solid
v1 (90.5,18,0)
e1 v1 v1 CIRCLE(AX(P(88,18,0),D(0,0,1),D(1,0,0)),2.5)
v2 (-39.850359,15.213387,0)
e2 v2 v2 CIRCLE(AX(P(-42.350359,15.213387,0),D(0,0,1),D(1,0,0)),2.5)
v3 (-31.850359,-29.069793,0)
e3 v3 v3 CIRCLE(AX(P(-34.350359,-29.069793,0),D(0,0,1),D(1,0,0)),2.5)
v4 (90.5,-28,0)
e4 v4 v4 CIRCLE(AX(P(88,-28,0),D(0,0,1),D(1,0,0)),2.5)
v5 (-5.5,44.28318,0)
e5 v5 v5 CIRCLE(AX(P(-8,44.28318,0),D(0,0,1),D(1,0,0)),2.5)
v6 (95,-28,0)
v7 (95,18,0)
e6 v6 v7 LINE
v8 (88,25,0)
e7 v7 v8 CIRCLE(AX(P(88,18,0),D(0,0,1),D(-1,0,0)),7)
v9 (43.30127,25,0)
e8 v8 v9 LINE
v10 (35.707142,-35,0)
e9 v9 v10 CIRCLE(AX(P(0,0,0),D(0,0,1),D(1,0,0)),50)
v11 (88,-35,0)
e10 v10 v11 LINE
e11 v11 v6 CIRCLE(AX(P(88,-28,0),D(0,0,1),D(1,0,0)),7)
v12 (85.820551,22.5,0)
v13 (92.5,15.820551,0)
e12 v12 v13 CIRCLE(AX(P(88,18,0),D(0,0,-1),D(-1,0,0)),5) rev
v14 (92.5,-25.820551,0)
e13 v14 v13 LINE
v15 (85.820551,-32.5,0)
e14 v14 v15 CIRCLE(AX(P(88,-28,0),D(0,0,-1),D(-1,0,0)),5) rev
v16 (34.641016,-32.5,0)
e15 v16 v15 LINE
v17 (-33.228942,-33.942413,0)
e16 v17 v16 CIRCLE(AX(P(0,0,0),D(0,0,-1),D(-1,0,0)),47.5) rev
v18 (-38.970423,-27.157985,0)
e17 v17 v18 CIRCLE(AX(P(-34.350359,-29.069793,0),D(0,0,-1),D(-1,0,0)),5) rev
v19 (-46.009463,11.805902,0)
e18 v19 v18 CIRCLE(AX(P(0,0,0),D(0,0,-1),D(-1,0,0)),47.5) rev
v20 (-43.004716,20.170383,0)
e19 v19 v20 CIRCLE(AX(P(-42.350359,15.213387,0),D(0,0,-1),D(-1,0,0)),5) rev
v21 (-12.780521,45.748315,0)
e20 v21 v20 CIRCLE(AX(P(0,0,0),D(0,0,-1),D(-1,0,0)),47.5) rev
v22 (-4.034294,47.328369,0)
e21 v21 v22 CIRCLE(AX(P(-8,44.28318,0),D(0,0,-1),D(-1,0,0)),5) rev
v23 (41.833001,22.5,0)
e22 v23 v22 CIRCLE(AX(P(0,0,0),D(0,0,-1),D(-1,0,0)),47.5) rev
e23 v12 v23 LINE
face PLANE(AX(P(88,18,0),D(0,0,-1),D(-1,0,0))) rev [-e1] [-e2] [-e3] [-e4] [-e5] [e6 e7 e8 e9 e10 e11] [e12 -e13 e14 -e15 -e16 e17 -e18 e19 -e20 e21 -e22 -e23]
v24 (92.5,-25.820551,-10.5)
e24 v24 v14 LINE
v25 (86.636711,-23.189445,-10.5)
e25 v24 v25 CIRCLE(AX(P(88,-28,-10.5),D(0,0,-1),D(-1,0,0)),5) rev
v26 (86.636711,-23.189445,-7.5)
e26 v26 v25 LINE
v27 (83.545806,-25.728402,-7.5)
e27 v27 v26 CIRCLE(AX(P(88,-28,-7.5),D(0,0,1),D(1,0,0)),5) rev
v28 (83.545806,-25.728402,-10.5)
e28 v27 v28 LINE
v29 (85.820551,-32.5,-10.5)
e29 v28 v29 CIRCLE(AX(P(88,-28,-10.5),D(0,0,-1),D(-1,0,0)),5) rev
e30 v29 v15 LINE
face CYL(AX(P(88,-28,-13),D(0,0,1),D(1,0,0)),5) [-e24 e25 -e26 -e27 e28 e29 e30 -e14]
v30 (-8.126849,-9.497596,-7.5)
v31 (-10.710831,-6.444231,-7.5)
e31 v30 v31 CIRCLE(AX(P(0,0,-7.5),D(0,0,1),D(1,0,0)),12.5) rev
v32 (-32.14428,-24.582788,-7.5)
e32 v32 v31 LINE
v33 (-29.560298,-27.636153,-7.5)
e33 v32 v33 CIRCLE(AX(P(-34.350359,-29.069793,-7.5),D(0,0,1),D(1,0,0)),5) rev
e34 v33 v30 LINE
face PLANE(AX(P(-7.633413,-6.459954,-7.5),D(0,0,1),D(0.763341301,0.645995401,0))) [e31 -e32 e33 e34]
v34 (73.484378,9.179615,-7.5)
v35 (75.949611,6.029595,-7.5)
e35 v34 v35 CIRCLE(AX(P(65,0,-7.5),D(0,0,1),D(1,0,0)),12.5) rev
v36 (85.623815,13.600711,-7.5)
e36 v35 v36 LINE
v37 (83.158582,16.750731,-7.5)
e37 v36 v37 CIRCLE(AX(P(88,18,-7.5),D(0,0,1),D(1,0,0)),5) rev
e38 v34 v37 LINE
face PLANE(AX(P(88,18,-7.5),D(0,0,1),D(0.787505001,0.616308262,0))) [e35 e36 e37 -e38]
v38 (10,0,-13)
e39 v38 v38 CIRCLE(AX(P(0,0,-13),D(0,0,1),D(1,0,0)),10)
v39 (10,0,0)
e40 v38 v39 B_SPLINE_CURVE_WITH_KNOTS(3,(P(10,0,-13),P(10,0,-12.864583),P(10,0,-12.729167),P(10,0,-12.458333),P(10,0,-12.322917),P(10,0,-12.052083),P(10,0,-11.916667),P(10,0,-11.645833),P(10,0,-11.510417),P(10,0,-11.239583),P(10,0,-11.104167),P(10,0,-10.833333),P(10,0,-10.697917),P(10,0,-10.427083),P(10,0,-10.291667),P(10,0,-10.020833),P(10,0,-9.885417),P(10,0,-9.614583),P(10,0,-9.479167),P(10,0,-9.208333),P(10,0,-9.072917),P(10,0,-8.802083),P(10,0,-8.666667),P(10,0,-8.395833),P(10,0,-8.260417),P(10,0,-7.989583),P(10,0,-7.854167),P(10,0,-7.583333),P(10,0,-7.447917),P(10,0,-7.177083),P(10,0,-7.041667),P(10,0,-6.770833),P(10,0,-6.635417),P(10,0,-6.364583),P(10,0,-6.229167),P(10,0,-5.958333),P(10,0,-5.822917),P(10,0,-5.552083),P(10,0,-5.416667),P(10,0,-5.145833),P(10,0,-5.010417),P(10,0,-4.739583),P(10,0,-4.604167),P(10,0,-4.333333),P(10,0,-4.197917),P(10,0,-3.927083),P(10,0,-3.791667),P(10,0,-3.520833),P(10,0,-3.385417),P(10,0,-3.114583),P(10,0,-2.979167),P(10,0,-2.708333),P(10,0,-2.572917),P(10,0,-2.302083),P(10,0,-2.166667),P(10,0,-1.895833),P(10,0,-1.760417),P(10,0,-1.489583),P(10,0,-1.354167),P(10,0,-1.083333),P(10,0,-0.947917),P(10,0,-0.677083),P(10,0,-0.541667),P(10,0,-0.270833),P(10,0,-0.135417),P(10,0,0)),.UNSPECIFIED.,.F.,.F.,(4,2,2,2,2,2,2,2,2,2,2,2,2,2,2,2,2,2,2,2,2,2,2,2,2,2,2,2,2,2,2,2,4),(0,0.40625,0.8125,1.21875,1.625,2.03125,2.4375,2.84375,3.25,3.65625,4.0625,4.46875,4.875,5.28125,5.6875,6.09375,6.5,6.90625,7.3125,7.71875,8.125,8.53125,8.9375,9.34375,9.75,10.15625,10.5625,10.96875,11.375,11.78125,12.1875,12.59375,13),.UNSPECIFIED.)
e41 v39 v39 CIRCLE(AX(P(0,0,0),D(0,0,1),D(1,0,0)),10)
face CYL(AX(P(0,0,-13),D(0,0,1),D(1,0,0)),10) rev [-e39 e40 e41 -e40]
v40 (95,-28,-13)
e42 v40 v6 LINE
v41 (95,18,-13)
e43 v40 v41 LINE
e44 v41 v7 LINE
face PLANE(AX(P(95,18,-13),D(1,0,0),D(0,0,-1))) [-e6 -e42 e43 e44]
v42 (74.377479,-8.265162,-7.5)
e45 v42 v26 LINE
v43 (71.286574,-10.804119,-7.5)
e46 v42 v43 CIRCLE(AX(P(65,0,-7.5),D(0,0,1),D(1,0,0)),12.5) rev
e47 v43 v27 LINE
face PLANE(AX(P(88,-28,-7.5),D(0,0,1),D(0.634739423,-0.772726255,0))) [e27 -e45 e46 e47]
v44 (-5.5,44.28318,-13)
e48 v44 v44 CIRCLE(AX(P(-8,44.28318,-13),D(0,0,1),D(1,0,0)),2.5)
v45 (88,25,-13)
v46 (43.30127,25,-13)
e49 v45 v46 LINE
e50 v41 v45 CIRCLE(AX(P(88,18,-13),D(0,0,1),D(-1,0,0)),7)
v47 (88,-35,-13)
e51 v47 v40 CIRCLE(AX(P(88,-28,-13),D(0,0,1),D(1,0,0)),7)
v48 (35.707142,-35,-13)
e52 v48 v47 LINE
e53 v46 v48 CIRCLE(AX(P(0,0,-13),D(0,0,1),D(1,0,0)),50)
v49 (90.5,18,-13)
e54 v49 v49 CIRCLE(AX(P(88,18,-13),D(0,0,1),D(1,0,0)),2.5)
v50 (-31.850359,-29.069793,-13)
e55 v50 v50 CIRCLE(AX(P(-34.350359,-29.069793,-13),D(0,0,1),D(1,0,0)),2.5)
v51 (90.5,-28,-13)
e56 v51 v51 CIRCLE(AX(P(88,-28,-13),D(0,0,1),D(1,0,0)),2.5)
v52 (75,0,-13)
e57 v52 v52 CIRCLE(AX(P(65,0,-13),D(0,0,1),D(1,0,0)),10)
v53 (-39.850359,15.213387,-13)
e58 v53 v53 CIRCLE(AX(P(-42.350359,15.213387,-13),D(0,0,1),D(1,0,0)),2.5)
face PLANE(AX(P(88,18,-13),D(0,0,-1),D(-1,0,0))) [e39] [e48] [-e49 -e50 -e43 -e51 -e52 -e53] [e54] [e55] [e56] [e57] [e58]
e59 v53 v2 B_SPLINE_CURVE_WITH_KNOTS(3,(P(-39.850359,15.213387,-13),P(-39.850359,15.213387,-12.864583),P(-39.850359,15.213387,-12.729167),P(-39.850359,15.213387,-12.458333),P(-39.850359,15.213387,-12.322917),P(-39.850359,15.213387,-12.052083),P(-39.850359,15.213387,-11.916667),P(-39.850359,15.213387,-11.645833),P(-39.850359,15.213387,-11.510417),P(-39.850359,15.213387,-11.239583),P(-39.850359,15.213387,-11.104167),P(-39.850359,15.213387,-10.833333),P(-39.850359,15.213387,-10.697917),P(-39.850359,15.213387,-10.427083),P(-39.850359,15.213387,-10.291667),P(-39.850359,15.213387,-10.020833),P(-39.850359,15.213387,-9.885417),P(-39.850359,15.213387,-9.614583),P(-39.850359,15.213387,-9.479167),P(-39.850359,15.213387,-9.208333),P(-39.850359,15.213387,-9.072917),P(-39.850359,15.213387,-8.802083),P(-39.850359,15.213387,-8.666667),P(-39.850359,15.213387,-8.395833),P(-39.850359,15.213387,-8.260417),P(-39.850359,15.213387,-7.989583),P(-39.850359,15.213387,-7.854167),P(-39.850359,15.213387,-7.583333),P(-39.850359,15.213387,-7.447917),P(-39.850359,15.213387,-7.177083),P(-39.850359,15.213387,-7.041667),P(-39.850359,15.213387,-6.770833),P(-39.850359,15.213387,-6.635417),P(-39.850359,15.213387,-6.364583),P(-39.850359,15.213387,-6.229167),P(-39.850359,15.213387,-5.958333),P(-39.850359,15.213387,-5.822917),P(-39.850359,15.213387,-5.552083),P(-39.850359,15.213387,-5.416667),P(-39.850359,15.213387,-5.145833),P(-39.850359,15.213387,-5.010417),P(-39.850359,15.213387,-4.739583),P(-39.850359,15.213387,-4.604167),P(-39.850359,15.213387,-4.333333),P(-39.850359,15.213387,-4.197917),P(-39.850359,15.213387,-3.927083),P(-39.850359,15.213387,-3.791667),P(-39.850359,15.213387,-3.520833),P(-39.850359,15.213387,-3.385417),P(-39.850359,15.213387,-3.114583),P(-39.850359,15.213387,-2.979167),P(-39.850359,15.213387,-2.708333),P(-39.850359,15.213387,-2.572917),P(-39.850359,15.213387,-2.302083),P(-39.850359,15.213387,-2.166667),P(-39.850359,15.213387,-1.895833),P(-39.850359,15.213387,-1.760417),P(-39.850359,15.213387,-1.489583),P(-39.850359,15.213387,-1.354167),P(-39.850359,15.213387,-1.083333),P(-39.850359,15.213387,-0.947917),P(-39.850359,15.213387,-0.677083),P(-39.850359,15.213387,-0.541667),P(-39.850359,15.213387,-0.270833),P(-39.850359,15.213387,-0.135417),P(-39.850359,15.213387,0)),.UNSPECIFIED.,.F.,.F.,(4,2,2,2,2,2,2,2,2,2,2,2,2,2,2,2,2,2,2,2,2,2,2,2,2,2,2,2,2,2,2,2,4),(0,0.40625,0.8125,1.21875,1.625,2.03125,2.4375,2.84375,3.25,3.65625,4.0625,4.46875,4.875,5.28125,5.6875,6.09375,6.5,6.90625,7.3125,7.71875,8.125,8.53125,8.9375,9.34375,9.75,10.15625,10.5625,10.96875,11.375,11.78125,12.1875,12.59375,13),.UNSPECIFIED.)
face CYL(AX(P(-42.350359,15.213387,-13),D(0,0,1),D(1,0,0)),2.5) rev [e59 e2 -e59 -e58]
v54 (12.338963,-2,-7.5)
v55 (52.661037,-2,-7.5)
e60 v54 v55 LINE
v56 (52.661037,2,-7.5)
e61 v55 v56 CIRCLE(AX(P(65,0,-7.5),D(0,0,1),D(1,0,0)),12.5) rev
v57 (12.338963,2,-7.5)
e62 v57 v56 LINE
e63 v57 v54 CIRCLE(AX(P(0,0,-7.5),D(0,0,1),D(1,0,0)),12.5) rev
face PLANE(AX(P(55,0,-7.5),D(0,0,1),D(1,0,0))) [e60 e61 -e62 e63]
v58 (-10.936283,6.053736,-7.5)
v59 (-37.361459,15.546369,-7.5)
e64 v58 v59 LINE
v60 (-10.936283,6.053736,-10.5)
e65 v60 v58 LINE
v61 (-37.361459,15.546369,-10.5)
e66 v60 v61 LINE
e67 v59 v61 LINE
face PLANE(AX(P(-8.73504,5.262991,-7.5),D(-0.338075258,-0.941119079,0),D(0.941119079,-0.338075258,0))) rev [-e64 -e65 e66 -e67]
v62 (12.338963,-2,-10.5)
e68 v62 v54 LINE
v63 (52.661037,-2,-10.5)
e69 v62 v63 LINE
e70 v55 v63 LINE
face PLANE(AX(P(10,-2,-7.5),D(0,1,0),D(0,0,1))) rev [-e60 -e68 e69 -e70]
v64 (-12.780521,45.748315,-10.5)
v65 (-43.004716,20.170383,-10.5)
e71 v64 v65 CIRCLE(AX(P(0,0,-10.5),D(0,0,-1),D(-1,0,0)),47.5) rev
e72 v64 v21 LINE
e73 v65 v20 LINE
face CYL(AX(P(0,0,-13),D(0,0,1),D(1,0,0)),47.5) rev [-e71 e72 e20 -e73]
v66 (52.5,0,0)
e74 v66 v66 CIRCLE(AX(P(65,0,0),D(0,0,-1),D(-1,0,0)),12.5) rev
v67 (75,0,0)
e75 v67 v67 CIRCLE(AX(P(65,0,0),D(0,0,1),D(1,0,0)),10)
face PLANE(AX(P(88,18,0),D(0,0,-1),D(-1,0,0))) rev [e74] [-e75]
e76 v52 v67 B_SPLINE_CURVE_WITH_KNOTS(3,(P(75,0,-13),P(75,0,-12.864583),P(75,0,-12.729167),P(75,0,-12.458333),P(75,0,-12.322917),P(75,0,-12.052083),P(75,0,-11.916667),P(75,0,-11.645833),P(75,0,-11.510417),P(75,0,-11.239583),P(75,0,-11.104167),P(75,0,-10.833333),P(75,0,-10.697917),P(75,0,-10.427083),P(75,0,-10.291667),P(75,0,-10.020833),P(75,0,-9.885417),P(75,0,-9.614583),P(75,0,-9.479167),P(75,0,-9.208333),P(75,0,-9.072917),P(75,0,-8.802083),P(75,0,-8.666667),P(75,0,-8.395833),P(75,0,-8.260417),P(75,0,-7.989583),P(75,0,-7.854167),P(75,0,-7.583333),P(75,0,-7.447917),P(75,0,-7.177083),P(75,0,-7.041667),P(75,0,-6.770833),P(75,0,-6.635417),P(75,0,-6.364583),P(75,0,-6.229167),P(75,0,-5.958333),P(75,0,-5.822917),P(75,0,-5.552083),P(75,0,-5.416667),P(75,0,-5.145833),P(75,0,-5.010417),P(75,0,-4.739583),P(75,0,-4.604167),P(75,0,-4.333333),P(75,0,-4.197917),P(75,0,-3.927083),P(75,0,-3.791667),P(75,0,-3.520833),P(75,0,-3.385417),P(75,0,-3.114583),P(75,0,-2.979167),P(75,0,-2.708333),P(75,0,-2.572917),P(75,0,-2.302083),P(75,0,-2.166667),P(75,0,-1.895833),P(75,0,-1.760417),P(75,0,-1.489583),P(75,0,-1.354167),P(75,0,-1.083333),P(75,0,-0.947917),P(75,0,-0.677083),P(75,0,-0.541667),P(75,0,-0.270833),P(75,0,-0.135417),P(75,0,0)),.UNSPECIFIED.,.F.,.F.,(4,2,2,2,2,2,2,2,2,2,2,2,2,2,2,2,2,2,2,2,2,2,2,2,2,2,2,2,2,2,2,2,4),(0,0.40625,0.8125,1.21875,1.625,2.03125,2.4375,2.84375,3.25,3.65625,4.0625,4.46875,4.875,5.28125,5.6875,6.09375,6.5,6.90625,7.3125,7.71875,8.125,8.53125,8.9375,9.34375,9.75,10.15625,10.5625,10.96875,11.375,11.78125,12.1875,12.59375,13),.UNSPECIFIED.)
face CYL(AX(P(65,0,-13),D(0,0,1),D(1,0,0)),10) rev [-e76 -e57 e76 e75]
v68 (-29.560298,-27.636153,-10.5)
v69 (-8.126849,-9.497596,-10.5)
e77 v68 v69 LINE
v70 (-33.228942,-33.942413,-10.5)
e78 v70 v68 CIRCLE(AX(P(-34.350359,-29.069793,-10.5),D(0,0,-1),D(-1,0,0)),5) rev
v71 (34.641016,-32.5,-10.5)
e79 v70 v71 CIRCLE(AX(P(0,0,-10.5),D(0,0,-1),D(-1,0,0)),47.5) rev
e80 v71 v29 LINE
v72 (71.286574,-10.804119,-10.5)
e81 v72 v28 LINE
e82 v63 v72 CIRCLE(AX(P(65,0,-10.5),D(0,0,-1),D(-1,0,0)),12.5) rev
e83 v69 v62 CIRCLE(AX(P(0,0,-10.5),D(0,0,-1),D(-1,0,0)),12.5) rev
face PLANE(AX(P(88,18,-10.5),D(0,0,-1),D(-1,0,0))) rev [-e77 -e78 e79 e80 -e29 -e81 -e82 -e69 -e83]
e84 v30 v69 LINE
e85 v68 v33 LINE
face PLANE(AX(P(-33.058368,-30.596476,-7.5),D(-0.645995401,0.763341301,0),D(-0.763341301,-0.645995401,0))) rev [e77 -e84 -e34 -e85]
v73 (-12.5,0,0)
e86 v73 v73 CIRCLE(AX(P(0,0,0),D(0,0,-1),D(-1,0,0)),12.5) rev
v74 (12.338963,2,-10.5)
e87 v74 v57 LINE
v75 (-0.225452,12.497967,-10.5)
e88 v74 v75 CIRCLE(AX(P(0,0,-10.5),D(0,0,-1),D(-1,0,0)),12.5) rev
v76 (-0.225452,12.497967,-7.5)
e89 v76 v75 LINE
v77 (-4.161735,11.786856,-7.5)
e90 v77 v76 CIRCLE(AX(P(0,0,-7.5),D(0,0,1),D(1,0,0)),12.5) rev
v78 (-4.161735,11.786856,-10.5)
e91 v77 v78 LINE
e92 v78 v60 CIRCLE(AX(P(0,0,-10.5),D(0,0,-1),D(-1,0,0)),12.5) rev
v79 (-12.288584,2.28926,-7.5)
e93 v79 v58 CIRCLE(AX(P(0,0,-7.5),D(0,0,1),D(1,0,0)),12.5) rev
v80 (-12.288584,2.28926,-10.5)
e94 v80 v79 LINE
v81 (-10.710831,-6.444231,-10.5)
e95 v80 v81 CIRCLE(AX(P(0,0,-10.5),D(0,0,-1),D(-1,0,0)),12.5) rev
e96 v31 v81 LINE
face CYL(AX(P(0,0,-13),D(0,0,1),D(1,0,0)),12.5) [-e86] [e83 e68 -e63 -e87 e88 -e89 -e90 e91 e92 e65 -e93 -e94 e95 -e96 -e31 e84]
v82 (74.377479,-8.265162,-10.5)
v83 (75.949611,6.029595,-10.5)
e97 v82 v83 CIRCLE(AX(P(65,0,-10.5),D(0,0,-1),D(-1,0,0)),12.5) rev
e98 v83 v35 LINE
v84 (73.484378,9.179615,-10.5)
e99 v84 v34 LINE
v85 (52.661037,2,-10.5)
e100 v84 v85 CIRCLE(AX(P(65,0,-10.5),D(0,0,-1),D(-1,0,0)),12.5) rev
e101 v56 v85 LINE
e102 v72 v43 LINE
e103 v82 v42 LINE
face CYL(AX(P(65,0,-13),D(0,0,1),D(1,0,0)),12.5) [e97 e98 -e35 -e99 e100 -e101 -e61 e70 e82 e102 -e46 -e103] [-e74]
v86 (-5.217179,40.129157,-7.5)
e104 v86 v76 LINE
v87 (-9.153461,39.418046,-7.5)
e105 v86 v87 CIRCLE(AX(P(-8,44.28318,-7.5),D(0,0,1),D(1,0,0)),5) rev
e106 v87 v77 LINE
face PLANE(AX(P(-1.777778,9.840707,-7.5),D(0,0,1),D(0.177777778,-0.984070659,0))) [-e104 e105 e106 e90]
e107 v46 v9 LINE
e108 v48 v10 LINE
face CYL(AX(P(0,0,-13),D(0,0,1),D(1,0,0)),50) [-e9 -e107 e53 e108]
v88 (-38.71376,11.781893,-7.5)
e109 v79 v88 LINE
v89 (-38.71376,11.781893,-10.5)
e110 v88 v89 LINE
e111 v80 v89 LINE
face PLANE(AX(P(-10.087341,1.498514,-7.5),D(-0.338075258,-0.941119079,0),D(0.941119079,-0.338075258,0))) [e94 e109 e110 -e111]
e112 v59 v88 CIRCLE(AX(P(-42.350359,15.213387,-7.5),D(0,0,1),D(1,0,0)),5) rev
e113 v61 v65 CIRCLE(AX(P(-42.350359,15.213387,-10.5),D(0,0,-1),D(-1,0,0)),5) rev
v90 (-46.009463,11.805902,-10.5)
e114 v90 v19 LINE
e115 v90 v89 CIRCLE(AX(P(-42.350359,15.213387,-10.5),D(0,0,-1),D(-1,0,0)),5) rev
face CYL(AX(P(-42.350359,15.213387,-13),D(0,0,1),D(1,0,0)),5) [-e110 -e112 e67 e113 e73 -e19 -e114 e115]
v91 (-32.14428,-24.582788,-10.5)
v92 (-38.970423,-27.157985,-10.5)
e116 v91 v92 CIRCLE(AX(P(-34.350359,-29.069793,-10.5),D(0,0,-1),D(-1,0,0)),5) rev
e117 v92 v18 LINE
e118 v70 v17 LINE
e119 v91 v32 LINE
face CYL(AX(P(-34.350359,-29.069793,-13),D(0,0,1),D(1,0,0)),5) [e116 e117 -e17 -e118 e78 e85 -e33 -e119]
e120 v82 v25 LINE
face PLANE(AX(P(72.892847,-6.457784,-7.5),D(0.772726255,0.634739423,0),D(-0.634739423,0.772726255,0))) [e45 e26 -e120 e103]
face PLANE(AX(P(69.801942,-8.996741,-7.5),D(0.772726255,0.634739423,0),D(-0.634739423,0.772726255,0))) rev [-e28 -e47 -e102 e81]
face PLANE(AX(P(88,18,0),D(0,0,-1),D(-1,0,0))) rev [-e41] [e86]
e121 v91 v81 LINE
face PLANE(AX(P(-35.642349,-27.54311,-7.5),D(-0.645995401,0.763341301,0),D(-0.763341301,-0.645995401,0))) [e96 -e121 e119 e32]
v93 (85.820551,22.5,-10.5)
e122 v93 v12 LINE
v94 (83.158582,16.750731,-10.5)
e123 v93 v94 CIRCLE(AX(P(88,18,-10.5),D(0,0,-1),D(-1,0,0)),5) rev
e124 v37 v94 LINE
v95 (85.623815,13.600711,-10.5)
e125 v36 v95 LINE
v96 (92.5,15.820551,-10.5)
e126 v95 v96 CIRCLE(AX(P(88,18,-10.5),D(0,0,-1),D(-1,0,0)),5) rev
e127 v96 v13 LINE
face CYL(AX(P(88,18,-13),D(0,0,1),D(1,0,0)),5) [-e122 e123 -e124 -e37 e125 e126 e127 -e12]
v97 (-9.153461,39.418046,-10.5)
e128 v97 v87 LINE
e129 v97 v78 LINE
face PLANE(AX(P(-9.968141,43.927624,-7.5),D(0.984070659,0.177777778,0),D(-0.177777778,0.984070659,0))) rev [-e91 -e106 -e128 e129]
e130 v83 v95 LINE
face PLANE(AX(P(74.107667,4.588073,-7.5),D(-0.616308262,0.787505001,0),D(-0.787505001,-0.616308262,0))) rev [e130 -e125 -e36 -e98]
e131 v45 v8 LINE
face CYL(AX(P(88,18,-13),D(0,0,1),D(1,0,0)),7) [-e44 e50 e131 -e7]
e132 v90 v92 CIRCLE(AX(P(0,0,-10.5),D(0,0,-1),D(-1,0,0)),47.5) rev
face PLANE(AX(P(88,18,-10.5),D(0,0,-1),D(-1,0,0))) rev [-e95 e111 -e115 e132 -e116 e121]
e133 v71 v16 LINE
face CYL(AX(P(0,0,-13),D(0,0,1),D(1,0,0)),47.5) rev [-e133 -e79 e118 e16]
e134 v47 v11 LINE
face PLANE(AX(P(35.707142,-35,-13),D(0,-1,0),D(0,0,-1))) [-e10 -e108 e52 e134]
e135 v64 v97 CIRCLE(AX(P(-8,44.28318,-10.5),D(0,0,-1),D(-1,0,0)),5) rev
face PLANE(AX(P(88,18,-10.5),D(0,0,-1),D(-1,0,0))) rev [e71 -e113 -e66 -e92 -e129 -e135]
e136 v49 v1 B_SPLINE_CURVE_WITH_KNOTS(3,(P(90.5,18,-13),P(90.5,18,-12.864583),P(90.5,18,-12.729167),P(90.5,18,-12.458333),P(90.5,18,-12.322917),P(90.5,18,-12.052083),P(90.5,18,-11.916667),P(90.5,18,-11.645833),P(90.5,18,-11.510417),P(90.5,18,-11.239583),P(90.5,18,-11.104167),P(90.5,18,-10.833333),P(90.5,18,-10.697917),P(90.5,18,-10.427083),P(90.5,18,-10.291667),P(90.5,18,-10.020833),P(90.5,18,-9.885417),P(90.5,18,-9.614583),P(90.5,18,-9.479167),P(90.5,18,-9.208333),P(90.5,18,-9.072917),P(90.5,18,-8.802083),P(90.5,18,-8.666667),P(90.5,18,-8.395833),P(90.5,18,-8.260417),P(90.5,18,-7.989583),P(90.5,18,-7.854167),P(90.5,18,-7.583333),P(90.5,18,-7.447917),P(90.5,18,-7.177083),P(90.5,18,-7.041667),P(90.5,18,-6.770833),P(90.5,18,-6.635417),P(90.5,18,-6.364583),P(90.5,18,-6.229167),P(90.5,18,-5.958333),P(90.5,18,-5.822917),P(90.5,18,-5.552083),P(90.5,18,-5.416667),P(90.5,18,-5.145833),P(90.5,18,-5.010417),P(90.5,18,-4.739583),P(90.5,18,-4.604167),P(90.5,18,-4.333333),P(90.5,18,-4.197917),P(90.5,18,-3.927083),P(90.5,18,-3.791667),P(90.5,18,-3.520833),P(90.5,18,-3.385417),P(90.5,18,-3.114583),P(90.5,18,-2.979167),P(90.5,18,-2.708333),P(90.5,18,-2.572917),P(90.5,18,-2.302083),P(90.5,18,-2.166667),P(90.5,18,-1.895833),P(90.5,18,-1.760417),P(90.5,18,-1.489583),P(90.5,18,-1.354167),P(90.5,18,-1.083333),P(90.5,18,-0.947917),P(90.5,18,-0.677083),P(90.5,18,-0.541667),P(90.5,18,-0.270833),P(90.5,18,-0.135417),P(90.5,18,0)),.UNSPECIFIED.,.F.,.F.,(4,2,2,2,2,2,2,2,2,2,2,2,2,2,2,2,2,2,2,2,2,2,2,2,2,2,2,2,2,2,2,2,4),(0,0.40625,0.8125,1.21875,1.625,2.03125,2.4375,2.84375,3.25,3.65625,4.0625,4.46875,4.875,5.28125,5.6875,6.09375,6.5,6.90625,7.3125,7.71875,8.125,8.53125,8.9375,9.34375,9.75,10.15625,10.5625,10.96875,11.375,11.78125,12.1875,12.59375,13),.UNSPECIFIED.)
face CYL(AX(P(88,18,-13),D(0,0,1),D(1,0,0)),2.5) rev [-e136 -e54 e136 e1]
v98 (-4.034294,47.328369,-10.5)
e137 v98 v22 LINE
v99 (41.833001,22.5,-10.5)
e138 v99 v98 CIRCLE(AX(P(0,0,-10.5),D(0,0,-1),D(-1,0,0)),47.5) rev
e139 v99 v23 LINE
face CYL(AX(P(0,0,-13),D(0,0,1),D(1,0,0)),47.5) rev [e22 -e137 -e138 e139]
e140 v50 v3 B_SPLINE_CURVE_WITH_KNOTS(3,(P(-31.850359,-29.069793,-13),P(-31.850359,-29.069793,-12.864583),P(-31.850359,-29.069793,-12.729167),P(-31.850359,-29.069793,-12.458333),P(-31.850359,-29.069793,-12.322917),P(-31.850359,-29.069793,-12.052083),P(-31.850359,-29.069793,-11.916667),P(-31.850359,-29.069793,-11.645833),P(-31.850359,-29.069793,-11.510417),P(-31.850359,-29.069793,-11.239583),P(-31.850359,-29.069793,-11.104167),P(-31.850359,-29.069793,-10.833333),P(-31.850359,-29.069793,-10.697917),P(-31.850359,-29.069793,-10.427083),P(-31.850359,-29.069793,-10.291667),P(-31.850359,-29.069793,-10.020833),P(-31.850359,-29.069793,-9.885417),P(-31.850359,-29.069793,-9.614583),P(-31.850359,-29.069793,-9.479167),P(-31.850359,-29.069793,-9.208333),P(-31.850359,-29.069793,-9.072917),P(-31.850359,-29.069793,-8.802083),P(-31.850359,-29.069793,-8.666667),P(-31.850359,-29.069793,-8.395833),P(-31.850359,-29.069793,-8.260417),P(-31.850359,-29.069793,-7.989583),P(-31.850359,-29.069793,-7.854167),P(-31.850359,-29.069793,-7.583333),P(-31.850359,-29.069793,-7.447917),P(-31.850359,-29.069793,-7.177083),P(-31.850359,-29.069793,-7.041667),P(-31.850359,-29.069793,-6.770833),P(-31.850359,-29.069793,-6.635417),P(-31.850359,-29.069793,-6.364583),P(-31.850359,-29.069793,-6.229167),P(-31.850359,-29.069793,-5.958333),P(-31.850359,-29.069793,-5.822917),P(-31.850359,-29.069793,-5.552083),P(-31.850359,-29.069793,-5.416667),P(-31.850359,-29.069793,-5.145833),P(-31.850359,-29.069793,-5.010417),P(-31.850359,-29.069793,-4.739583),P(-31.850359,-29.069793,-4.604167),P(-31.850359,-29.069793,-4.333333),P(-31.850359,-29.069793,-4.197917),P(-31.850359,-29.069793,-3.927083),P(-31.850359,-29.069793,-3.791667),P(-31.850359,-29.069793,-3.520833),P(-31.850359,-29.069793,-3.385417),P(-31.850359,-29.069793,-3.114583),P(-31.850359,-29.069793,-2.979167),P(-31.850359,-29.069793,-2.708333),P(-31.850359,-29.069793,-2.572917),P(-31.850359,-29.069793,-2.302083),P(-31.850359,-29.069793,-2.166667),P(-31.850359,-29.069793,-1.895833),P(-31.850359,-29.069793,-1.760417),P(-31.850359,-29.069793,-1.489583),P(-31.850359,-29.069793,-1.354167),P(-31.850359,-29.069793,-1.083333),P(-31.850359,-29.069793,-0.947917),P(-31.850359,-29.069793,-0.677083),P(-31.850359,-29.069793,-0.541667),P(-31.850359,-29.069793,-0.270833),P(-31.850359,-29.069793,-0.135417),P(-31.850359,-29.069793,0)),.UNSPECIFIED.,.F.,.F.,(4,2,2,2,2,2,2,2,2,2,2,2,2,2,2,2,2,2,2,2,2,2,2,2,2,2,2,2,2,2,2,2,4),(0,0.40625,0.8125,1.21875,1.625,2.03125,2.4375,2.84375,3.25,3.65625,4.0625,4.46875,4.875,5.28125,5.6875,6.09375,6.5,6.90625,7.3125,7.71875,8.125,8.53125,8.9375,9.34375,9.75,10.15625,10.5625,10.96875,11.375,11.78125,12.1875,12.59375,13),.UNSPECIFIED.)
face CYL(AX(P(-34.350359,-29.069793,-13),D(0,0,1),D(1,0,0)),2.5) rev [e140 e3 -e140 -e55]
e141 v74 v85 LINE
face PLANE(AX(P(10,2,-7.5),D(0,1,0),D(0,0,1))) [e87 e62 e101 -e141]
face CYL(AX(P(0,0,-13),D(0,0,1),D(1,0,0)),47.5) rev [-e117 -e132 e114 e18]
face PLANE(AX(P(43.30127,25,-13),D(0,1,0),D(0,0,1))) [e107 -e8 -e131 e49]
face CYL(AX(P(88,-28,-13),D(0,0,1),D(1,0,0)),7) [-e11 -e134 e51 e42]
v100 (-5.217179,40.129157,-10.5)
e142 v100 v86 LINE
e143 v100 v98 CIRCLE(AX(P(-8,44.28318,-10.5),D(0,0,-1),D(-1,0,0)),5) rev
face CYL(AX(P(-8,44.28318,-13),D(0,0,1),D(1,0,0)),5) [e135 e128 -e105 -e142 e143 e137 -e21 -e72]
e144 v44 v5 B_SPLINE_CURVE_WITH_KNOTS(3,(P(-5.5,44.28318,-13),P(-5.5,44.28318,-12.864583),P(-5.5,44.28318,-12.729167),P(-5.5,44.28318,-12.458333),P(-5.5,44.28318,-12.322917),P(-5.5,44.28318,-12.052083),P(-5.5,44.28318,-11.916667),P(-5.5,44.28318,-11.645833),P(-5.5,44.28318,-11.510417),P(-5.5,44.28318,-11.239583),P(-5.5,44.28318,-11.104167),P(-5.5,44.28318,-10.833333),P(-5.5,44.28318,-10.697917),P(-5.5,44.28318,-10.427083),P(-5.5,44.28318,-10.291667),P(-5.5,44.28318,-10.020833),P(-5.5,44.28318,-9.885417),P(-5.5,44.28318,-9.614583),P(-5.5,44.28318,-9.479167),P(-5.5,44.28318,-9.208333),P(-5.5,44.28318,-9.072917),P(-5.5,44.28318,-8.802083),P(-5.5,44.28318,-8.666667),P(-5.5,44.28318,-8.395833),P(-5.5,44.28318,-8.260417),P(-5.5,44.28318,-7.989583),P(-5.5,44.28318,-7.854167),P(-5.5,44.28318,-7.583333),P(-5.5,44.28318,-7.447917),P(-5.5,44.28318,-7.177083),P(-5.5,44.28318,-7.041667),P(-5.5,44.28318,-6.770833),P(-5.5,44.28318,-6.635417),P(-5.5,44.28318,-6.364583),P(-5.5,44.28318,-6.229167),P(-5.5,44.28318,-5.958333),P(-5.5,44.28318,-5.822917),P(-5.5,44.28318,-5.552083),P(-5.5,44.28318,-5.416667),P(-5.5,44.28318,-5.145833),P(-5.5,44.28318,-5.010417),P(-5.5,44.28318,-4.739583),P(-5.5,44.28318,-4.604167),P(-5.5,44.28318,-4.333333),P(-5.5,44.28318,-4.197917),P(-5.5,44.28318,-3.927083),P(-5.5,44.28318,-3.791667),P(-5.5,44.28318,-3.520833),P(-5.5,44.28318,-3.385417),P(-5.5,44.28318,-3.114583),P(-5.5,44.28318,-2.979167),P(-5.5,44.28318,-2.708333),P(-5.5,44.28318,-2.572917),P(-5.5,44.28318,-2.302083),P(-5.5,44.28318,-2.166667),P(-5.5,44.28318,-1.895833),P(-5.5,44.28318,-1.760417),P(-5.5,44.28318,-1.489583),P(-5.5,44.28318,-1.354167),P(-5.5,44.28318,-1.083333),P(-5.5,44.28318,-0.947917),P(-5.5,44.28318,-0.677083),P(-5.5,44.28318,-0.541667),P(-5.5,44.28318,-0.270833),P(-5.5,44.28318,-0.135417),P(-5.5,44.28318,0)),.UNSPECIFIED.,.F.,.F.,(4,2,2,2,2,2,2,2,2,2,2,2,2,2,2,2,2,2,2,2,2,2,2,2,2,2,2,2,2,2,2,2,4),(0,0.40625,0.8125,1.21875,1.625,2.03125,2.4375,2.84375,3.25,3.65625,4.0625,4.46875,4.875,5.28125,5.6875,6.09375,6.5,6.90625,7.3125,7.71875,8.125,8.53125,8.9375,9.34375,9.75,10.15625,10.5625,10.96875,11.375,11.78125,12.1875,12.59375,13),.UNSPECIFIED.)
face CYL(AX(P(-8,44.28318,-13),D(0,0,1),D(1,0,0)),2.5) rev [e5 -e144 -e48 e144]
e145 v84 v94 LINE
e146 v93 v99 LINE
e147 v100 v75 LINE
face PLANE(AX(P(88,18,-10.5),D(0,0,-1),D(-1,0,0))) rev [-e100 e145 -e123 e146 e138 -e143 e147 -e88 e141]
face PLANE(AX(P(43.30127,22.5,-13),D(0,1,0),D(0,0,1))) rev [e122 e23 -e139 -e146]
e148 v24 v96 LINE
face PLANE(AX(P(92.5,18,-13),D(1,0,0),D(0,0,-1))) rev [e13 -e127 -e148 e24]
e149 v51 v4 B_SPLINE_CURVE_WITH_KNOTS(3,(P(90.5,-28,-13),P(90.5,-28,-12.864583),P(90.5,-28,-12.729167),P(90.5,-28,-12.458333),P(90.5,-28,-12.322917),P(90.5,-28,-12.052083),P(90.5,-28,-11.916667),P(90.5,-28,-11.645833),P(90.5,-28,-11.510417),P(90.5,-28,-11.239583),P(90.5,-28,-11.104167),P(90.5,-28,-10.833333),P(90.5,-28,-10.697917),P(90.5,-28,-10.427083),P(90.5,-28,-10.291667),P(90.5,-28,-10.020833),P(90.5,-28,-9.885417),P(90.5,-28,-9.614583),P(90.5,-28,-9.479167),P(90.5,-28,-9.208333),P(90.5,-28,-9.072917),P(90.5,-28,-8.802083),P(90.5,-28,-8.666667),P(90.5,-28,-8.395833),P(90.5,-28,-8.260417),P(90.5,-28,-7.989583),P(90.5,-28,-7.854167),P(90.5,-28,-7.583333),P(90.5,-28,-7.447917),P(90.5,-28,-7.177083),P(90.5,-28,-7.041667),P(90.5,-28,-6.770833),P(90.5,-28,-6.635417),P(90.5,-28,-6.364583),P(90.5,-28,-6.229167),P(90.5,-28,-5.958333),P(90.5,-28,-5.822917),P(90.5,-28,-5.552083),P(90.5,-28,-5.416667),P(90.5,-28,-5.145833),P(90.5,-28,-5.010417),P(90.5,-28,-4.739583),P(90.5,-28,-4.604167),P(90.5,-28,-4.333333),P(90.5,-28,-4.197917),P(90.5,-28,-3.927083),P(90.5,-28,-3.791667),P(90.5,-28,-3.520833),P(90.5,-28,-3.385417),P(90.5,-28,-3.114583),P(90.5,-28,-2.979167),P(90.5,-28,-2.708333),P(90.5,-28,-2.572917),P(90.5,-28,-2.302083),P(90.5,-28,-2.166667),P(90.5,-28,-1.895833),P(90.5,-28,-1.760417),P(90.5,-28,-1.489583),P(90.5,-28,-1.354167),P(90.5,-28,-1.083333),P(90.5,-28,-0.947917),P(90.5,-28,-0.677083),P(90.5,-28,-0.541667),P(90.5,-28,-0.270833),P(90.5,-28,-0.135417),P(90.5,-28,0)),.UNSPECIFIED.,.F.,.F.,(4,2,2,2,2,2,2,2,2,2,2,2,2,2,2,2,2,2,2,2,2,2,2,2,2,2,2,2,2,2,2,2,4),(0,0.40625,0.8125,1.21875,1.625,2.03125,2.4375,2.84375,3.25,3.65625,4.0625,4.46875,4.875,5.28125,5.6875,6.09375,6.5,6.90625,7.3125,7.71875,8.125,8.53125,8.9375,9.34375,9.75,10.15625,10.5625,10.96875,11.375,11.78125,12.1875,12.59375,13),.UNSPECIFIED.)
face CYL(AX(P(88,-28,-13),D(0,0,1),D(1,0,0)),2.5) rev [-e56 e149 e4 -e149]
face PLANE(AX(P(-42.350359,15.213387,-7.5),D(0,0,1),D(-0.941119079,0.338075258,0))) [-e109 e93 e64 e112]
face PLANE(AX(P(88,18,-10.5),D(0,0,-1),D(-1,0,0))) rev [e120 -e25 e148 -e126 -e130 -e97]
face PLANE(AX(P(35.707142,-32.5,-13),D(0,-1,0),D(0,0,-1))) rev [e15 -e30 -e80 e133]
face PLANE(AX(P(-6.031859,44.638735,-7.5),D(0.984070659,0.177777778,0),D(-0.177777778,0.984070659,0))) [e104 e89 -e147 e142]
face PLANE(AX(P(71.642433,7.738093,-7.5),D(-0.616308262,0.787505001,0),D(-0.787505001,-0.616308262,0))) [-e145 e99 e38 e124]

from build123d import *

# Parameters (mm, degrees)
SKETCH1_R        = 10
SKETCH1_R_2      = 2.5
EXTRUDE1_DEPTH   = 13
SHELL1_START     = -10.5
SHELL1_OUTLINE_R = 12.5
SHELL1_DEPTH     = 10.5
RIB1_REACH       = 109.616
SKETCH2_WALLS_W  = 262.2324325
SKETCH2_WALLS_H  = 4


# Read off the part's stored shape, not the designer's step: Shell1
with BuildPart() as part:
    # Sketch1 → Extrude1 (new body)
    with BuildSketch(Plane.XY):
        with BuildLine():
            Line((43.301270189, 25), (88, 25))
            ThreePointArc((88, 25), (92.949747468, 22.949747468), (95, 18))
            Line((95, 18), (95, -28))
            ThreePointArc((95, -28), (92.949747468, -32.949747468), (88, -35))
            Line((88, -35), (35.707142143, -35))
            ThreePointArc((35.707142143, -35), (-49.604256922, 6.278351312), (43.301270189, 25))
        make_face()
        Circle(SKETCH1_R, mode=Mode.SUBTRACT)
        with Locations((65, 0)):
            Circle(SKETCH1_R, mode=Mode.SUBTRACT)
        with Locations((-8, 44.283179651)):
            Circle(SKETCH1_R_2, mode=Mode.SUBTRACT)
        with Locations((-42.350358538, 15.213386595)):
            Circle(SKETCH1_R_2, mode=Mode.SUBTRACT)
        with Locations((-34.350358538, -29.069793056)):
            Circle(SKETCH1_R_2, mode=Mode.SUBTRACT)
        with Locations((88, 18)):
            Circle(SKETCH1_R_2, mode=Mode.SUBTRACT)
        with Locations((88, -28)):
            Circle(SKETCH1_R_2, mode=Mode.SUBTRACT)
    extrude(amount=-EXTRUDE1_DEPTH)

    # Shell1 outline → Shell1 (cut)
    with BuildSketch(Plane.XY.offset(SHELL1_START)):
        with BuildLine():
            ThreePointArc((-43.004716488, 20.170383234), (-37.644763145, 13.523010307), (-46.009463032, 11.805901554))
            ThreePointArc((-46.009463032, 11.805901554), (-46.743356298, -8.444444445), (-38.970422528, -27.157985344))
            ThreePointArc((-38.970422528, -27.157985344), (-30.533652034, -25.83981605), (-33.228942177, -33.942413023))
            ThreePointArc((-33.228942177, -33.942413023), (1.009270558, -47.489276399), (34.641016151, -32.5))
            Line((34.641016151, -32.5), (85.820550528, -32.5))
            ThreePointArc((85.820550528, -32.5), (84.464466094, -24.464466094), (92.5, -25.820550528))
            Line((92.5, -25.820550528), (92.5, 15.820550528))
            ThreePointArc((92.5, 15.820550528), (84.464466094, 14.464466094), (85.820550528, 22.5))
            Line((85.820550528, 22.5), (41.833001327, 22.5))
            ThreePointArc((41.833001327, 22.5), (22.611889377, 41.772628105), (-4.03429396, 47.328368578))
            ThreePointArc((-4.03429396, 47.328368578), (-7.111111111, 39.362826356), (-12.780520855, 45.748314577))
            ThreePointArc((-12.780520855, 45.748314577), (-30.684781559, 36.25871179), (-43.004716488, 20.170383234))
        make_face()
        Circle(SHELL1_OUTLINE_R, mode=Mode.SUBTRACT)
        with Locations((65, 0)):
            Circle(SHELL1_OUTLINE_R, mode=Mode.SUBTRACT)
    extrude(amount=SHELL1_DEPTH, mode=Mode.SUBTRACT)

    # Sketch2 walls → Rib1 (add, up to next)
    with BuildSketch(Plane.XY.offset(-7.5), mode=Mode.PRIVATE) as rib1_sk1:
        Polygon((-29.277690873, 150.813655589), (15.56363046, -97.40088046), (19.499913096, -96.689769349), (-25.341408238, 151.5247667), align=None)
    rib1_tool1 = extrude(rib1_sk1.sketch, amount=-RIB1_REACH, mode=Mode.PRIVATE) - part.part
    # Sketch2 walls → Rib1 (add, up to next)
    with BuildSketch(Plane.XY.offset(-7.5), mode=Mode.PRIVATE) as rib1_sk2:
        Polygon((93.48575309, -31.457464562), (-143.895001384, 53.816080049), (-145.247302414, 50.051603734), (92.133452059, -35.221940877), align=None)
    rib1_tool2 = extrude(rib1_sk2.sketch, amount=-RIB1_REACH, mode=Mode.PRIVATE) - part.part
    # Sketch2 walls → Rib1 (add, up to next)
    with BuildSketch(Plane.XY.offset(-7.5), mode=Mode.PRIVATE) as rib1_sk3:
        Polygon((-115.969611541, -100.762051855), (76.569821599, 62.178939584), (73.985839994, 65.232304787), (-118.553593146, -97.708686652), align=None)
    rib1_tool3 = extrude(rib1_sk3.sketch, amount=-RIB1_REACH, mode=Mode.PRIVATE) - part.part
    # Sketch2 walls → Rib1 (add, up to next)
    with BuildSketch(Plane.XY.offset(-7.5), mode=Mode.PRIVATE) as rib1_sk4:
        with Locations((32.5, 0)):
            Rectangle(SKETCH2_WALLS_W, SKETCH2_WALLS_H)
    rib1_tool4 = extrude(rib1_sk4.sketch, amount=-RIB1_REACH, mode=Mode.PRIVATE) - part.part
    # Sketch2 walls → Rib1 (add, up to next)
    with BuildSketch(Plane.XY.offset(-7.5), mode=Mode.PRIVATE) as rib1_sk5:
        Polygon((-11.428146954, -62.35299881), (174.768430011, 83.366061423), (172.303196964, 86.516081427), (-13.893380001, -59.202978806), align=None)
    rib1_tool5 = extrude(rib1_sk5.sketch, amount=-RIB1_REACH, mode=Mode.PRIVATE) - part.part
    # Sketch2 walls → Rib1 (add, up to next)
    with BuildSketch(Plane.XY.offset(-7.5), mode=Mode.PRIVATE) as rib1_sk6:
        Polygon((0.858947254, 74.933860572), (155.397541961, -113.20008081), (158.488446979, -110.661123117), (3.949852272, 77.472818265), align=None)
    rib1_tool6 = extrude(rib1_sk6.sketch, amount=-RIB1_REACH, mode=Mode.PRIVATE) - part.part
    add(rib1_tool1.solids().sort_by_distance((-4.888888889, 27.06194312, -7.5))[0])
    add(rib1_tool2.solids().sort_by_distance((-25.880774662, 9.297069586, -7.5))[0])
    add(rib1_tool3.solids().sort_by_distance((-20.991885773, -17.764873534, -7.5))[0])
    add(rib1_tool4.solids().sort_by_distance((32.5, 0, -7.5))[0])
    add(rib1_tool5.solids().sort_by_distance((80.437525005, 12.081541308, -7.5))[0])
    add(rib1_tool6.solids().sort_by_distance((79.673697117, -17.863631273, -7.5))[0])


solid = part.part
